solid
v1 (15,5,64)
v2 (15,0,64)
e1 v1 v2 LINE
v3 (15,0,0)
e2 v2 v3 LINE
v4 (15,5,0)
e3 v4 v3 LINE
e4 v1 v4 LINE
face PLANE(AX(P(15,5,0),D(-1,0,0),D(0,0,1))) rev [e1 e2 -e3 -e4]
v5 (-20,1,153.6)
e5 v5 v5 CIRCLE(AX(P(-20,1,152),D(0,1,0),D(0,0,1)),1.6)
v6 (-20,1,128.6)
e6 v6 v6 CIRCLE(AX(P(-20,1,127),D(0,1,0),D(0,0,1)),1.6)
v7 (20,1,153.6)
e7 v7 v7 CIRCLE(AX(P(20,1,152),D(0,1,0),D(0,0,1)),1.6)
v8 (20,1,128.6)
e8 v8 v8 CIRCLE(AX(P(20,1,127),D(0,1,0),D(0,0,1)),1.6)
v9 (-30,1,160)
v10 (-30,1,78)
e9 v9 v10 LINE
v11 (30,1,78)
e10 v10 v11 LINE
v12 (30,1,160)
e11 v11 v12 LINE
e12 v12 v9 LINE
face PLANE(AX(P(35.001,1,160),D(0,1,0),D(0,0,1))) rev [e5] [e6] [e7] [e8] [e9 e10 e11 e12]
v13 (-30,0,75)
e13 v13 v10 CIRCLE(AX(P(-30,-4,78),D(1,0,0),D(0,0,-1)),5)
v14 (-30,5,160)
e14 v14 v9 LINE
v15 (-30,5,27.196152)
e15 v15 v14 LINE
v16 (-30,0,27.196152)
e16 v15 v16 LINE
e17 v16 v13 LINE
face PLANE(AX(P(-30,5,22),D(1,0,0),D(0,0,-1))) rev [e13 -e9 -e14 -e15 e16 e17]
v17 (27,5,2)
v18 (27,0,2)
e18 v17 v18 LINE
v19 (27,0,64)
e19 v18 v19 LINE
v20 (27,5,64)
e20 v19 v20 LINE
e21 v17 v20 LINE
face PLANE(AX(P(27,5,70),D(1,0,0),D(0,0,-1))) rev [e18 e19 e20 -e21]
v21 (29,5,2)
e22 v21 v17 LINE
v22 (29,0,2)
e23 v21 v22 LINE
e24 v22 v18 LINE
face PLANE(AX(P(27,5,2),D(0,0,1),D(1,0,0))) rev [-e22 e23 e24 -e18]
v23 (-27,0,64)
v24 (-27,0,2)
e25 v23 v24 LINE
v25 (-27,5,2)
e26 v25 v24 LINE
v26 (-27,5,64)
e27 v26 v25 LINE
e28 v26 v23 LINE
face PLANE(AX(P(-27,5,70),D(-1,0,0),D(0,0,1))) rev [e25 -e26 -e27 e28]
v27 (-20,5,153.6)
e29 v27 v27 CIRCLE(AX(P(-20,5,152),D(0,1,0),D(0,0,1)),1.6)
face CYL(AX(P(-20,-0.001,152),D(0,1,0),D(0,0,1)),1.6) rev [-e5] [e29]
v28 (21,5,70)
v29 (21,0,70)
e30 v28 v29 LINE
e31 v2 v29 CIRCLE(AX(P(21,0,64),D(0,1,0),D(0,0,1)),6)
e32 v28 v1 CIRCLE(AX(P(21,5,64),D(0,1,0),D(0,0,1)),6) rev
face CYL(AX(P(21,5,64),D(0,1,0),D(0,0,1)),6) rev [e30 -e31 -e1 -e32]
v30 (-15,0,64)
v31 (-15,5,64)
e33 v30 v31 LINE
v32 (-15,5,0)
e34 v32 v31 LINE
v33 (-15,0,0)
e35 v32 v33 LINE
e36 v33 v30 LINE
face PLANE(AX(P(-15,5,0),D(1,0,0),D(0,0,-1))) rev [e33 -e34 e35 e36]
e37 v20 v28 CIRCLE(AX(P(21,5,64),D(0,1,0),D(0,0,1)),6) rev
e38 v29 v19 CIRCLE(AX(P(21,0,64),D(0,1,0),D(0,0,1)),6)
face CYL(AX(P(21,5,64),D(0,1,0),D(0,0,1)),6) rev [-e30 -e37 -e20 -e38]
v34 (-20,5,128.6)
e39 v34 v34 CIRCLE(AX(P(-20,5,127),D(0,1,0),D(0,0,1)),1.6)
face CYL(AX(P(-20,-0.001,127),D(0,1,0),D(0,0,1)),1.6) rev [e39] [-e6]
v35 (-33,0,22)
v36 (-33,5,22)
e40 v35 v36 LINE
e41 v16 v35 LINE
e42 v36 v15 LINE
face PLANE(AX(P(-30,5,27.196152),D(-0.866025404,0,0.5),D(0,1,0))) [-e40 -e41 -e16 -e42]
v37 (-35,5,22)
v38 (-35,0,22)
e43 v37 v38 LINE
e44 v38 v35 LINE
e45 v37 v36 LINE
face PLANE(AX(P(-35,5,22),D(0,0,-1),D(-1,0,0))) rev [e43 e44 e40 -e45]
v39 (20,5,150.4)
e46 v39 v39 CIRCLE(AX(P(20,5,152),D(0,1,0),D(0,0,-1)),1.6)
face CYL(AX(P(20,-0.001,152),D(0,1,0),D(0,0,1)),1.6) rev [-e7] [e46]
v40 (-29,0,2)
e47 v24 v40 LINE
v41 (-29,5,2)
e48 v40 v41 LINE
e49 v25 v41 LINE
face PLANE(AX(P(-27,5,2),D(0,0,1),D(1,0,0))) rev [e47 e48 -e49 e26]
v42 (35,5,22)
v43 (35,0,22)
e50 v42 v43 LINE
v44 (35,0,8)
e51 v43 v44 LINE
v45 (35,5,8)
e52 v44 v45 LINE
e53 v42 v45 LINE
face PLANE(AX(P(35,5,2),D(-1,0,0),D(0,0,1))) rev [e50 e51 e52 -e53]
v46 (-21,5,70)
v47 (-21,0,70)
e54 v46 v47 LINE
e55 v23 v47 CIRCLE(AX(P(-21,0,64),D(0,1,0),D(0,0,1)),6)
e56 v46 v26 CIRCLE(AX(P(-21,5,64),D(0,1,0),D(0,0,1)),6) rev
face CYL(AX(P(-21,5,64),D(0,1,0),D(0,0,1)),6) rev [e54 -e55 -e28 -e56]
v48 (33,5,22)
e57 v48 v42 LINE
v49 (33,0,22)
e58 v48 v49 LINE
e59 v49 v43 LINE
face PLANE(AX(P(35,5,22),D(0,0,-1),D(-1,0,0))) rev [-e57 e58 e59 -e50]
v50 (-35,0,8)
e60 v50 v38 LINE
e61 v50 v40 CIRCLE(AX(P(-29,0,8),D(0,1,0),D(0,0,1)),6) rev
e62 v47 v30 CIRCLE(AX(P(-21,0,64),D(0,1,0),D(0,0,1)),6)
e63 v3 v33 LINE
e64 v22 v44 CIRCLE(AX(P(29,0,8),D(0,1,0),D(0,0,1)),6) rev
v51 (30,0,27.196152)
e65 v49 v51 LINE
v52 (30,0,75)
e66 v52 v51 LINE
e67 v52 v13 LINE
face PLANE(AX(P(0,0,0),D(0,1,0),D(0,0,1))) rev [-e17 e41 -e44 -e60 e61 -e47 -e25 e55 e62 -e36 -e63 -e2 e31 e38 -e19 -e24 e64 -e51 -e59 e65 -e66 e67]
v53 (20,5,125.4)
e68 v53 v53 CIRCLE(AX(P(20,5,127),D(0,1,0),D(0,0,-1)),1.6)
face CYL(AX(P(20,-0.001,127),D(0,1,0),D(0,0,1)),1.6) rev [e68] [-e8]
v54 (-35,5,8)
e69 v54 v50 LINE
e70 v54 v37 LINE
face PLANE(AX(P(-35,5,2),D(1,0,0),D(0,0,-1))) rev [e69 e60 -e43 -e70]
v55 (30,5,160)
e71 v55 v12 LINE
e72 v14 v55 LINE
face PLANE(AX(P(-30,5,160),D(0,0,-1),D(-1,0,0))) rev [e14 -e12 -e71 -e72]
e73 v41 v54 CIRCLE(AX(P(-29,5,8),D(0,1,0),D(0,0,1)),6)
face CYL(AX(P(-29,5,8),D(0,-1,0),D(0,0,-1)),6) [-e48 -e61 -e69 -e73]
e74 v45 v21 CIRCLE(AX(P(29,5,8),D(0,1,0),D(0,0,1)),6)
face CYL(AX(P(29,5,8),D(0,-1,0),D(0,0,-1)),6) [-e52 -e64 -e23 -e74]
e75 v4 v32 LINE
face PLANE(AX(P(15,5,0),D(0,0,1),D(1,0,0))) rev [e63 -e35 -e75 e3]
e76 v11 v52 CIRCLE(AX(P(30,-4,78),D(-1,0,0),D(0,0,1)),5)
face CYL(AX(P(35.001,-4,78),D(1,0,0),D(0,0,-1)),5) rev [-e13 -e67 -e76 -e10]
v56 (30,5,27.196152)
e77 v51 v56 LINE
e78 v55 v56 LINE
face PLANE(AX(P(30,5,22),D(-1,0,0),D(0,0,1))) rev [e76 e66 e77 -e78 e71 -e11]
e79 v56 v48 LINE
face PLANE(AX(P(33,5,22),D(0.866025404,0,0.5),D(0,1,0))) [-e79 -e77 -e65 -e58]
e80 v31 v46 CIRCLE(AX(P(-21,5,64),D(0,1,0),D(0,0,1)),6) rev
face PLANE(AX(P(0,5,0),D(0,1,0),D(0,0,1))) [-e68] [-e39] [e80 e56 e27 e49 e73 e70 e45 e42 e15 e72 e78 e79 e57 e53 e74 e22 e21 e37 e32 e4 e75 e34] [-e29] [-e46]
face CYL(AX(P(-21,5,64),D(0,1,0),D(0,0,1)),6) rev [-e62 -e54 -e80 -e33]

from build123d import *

# Parameters (mm, degrees)
BOSS_EXTRUDE1_DEPTH = 5
FILLET1_R           = 6
CHAMFER1_SIZE       = 3
CHAMFER1_SIZE2      = 5.196152423
CHAMFER2_SIZE       = 3
CHAMFER2_SIZE2      = 5.196152423
CUT_EXTRUDE1_REACH  = 165.86
SKETCH4_R           = 1.6
CUT_EXTRUDE2_REACH  = 174.772
SKETCH5_W           = 85
SKETCH5_H           = 1
FILLET3_R           = 5


# Some blends are built 0.0001 mm under size
with BuildPart() as part:
    # Sketch2 → Boss-Extrude1 (new body)
    with BuildSketch(Plane(origin=(0, 0, 0), x_dir=(1, 0, 0), z_dir=(0, 1, 0))):
        Polygon((15, 0), (-15, 0), (-15, -70), (-27, -70), (-27, -2), (-35, -2), (-35, -22), (-30, -22), (-30, -160), (30, -160), (30, -22), (35, -22), (35, -2), (27, -2), (27, -70), (15, -70), align=None)
    extrude(amount=BOSS_EXTRUDE1_DEPTH)

    # Fillet1
    fillet1_edges = [part.edges().sort_by_distance(p)[0] for p in [
        (-27, 2.5, 70),
        (-15, 2.5, 70),
        (15, 2.5, 70),
        (27, 2.5, 70),
        (-35, 2.5, 2),
        (35, 2.5, 2),
    ]]
    fillet(fillet1_edges, radius=FILLET1_R - 0.0001)  # a hair under: the kernel refuses the full size

    # Chamfer1
    chamfer1_edges = [part.edges().sort_by_distance(p)[0] for p in [
        (-30, 2.5, 22),
    ]]
    chamfer1_side = [part.faces().sort_by_distance(p)[0] for p in [
        (-32.5, 2.5, 22),
    ]]
    chamfer(chamfer1_edges, length=CHAMFER1_SIZE, length2=CHAMFER1_SIZE2, reference=chamfer1_side[0])

    # Chamfer2
    chamfer2_edges = [part.edges().sort_by_distance(p)[0] for p in [
        (30, 2.5, 22),
    ]]
    chamfer2_side = [part.faces().sort_by_distance(p)[0] for p in [
        (32.5, 2.5, 22),
    ]]
    chamfer(chamfer2_edges, length=CHAMFER2_SIZE, length2=CHAMFER2_SIZE2, reference=chamfer2_side[0])

    # Sketch4 → Cut-Extrude1 (cut, up to next)
    with BuildSketch(Plane(origin=(0, 5, 0), x_dir=(1, 0, 0), z_dir=(0, 1, 0)), mode=Mode.PRIVATE) as cut_extrude1_sk1:
        with Locations(Location((-20, -152, 0), (0, 0, 270))):
            Circle(SKETCH4_R)
    cut_extrude1_tool1 = extrude(cut_extrude1_sk1.sketch, amount=-CUT_EXTRUDE1_REACH, mode=Mode.PRIVATE) & part.part
    # Sketch4 → Cut-Extrude1 (cut, up to next)
    with BuildSketch(Plane(origin=(0, 5, 0), x_dir=(1, 0, 0), z_dir=(0, 1, 0)), mode=Mode.PRIVATE) as cut_extrude1_sk2:
        with Locations(Location((20, -152, 0), (0, 0, 270))):
            Circle(SKETCH4_R)
    cut_extrude1_tool2 = extrude(cut_extrude1_sk2.sketch, amount=-CUT_EXTRUDE1_REACH, mode=Mode.PRIVATE) & part.part
    # Sketch4 → Cut-Extrude1 (cut, up to next)
    with BuildSketch(Plane(origin=(0, 5, 0), x_dir=(1, 0, 0), z_dir=(0, 1, 0)), mode=Mode.PRIVATE) as cut_extrude1_sk3:
        with Locations(Location((-20, -127, 0), (0, 0, 270))):
            Circle(SKETCH4_R)
    cut_extrude1_tool3 = extrude(cut_extrude1_sk3.sketch, amount=-CUT_EXTRUDE1_REACH, mode=Mode.PRIVATE) & part.part
    # Sketch4 → Cut-Extrude1 (cut, up to next)
    with BuildSketch(Plane(origin=(0, 5, 0), x_dir=(1, 0, 0), z_dir=(0, 1, 0)), mode=Mode.PRIVATE) as cut_extrude1_sk4:
        with Locations(Location((20, -127, 0), (0, 0, 270))):
            Circle(SKETCH4_R)
    cut_extrude1_tool4 = extrude(cut_extrude1_sk4.sketch, amount=-CUT_EXTRUDE1_REACH, mode=Mode.PRIVATE) & part.part
    add(cut_extrude1_tool1.solids().sort_by_distance((-20, 5, 152))[0], mode=Mode.SUBTRACT)
    add(cut_extrude1_tool2.solids().sort_by_distance((20, 5, 152))[0], mode=Mode.SUBTRACT)
    add(cut_extrude1_tool3.solids().sort_by_distance((-20, 5, 127))[0], mode=Mode.SUBTRACT)
    add(cut_extrude1_tool4.solids().sort_by_distance((20, 5, 127))[0], mode=Mode.SUBTRACT)

    # Sketch5 → Cut-Extrude2 (cut, up to next)
    with BuildSketch(Plane.ZY.offset(30), mode=Mode.PRIVATE) as cut_extrude2_sk1:
        with Locations((117.5, 0.5)):
            Rectangle(SKETCH5_W, SKETCH5_H)
    cut_extrude2_tool1 = extrude(cut_extrude2_sk1.sketch, amount=-CUT_EXTRUDE2_REACH, mode=Mode.PRIVATE) & part.part
    add(cut_extrude2_tool1.solids().sort_by_distance((-30, 0.5, 117.5))[0], mode=Mode.SUBTRACT)

    # Fillet3
    # the kernel refuses this fillet: 5 mm, written as the material it adds along each edge
    with BuildSketch(Plane(origin=(-30, 1, 75), x_dir=(0, -1, 0), z_dir=(1, 0, 0))) as fillet3_piece_1:
        with BuildLine():
            CenterArc((5, -3), FILLET3_R, 143.130102354, 36.869897646)
            Line((0, -3), (-0.1, -3))
            Line((-0.1, -3), (-0.1, 0))
            Line((-0.1, 0), (0, 0.1))
            ThreePointArc((0, 0.1), (0.5, 0.1), (0.92, 0.06))
            Line((0.92, 0.06), (1, 0))
        make_face()
    extrude(amount=60)


solid = part.part
